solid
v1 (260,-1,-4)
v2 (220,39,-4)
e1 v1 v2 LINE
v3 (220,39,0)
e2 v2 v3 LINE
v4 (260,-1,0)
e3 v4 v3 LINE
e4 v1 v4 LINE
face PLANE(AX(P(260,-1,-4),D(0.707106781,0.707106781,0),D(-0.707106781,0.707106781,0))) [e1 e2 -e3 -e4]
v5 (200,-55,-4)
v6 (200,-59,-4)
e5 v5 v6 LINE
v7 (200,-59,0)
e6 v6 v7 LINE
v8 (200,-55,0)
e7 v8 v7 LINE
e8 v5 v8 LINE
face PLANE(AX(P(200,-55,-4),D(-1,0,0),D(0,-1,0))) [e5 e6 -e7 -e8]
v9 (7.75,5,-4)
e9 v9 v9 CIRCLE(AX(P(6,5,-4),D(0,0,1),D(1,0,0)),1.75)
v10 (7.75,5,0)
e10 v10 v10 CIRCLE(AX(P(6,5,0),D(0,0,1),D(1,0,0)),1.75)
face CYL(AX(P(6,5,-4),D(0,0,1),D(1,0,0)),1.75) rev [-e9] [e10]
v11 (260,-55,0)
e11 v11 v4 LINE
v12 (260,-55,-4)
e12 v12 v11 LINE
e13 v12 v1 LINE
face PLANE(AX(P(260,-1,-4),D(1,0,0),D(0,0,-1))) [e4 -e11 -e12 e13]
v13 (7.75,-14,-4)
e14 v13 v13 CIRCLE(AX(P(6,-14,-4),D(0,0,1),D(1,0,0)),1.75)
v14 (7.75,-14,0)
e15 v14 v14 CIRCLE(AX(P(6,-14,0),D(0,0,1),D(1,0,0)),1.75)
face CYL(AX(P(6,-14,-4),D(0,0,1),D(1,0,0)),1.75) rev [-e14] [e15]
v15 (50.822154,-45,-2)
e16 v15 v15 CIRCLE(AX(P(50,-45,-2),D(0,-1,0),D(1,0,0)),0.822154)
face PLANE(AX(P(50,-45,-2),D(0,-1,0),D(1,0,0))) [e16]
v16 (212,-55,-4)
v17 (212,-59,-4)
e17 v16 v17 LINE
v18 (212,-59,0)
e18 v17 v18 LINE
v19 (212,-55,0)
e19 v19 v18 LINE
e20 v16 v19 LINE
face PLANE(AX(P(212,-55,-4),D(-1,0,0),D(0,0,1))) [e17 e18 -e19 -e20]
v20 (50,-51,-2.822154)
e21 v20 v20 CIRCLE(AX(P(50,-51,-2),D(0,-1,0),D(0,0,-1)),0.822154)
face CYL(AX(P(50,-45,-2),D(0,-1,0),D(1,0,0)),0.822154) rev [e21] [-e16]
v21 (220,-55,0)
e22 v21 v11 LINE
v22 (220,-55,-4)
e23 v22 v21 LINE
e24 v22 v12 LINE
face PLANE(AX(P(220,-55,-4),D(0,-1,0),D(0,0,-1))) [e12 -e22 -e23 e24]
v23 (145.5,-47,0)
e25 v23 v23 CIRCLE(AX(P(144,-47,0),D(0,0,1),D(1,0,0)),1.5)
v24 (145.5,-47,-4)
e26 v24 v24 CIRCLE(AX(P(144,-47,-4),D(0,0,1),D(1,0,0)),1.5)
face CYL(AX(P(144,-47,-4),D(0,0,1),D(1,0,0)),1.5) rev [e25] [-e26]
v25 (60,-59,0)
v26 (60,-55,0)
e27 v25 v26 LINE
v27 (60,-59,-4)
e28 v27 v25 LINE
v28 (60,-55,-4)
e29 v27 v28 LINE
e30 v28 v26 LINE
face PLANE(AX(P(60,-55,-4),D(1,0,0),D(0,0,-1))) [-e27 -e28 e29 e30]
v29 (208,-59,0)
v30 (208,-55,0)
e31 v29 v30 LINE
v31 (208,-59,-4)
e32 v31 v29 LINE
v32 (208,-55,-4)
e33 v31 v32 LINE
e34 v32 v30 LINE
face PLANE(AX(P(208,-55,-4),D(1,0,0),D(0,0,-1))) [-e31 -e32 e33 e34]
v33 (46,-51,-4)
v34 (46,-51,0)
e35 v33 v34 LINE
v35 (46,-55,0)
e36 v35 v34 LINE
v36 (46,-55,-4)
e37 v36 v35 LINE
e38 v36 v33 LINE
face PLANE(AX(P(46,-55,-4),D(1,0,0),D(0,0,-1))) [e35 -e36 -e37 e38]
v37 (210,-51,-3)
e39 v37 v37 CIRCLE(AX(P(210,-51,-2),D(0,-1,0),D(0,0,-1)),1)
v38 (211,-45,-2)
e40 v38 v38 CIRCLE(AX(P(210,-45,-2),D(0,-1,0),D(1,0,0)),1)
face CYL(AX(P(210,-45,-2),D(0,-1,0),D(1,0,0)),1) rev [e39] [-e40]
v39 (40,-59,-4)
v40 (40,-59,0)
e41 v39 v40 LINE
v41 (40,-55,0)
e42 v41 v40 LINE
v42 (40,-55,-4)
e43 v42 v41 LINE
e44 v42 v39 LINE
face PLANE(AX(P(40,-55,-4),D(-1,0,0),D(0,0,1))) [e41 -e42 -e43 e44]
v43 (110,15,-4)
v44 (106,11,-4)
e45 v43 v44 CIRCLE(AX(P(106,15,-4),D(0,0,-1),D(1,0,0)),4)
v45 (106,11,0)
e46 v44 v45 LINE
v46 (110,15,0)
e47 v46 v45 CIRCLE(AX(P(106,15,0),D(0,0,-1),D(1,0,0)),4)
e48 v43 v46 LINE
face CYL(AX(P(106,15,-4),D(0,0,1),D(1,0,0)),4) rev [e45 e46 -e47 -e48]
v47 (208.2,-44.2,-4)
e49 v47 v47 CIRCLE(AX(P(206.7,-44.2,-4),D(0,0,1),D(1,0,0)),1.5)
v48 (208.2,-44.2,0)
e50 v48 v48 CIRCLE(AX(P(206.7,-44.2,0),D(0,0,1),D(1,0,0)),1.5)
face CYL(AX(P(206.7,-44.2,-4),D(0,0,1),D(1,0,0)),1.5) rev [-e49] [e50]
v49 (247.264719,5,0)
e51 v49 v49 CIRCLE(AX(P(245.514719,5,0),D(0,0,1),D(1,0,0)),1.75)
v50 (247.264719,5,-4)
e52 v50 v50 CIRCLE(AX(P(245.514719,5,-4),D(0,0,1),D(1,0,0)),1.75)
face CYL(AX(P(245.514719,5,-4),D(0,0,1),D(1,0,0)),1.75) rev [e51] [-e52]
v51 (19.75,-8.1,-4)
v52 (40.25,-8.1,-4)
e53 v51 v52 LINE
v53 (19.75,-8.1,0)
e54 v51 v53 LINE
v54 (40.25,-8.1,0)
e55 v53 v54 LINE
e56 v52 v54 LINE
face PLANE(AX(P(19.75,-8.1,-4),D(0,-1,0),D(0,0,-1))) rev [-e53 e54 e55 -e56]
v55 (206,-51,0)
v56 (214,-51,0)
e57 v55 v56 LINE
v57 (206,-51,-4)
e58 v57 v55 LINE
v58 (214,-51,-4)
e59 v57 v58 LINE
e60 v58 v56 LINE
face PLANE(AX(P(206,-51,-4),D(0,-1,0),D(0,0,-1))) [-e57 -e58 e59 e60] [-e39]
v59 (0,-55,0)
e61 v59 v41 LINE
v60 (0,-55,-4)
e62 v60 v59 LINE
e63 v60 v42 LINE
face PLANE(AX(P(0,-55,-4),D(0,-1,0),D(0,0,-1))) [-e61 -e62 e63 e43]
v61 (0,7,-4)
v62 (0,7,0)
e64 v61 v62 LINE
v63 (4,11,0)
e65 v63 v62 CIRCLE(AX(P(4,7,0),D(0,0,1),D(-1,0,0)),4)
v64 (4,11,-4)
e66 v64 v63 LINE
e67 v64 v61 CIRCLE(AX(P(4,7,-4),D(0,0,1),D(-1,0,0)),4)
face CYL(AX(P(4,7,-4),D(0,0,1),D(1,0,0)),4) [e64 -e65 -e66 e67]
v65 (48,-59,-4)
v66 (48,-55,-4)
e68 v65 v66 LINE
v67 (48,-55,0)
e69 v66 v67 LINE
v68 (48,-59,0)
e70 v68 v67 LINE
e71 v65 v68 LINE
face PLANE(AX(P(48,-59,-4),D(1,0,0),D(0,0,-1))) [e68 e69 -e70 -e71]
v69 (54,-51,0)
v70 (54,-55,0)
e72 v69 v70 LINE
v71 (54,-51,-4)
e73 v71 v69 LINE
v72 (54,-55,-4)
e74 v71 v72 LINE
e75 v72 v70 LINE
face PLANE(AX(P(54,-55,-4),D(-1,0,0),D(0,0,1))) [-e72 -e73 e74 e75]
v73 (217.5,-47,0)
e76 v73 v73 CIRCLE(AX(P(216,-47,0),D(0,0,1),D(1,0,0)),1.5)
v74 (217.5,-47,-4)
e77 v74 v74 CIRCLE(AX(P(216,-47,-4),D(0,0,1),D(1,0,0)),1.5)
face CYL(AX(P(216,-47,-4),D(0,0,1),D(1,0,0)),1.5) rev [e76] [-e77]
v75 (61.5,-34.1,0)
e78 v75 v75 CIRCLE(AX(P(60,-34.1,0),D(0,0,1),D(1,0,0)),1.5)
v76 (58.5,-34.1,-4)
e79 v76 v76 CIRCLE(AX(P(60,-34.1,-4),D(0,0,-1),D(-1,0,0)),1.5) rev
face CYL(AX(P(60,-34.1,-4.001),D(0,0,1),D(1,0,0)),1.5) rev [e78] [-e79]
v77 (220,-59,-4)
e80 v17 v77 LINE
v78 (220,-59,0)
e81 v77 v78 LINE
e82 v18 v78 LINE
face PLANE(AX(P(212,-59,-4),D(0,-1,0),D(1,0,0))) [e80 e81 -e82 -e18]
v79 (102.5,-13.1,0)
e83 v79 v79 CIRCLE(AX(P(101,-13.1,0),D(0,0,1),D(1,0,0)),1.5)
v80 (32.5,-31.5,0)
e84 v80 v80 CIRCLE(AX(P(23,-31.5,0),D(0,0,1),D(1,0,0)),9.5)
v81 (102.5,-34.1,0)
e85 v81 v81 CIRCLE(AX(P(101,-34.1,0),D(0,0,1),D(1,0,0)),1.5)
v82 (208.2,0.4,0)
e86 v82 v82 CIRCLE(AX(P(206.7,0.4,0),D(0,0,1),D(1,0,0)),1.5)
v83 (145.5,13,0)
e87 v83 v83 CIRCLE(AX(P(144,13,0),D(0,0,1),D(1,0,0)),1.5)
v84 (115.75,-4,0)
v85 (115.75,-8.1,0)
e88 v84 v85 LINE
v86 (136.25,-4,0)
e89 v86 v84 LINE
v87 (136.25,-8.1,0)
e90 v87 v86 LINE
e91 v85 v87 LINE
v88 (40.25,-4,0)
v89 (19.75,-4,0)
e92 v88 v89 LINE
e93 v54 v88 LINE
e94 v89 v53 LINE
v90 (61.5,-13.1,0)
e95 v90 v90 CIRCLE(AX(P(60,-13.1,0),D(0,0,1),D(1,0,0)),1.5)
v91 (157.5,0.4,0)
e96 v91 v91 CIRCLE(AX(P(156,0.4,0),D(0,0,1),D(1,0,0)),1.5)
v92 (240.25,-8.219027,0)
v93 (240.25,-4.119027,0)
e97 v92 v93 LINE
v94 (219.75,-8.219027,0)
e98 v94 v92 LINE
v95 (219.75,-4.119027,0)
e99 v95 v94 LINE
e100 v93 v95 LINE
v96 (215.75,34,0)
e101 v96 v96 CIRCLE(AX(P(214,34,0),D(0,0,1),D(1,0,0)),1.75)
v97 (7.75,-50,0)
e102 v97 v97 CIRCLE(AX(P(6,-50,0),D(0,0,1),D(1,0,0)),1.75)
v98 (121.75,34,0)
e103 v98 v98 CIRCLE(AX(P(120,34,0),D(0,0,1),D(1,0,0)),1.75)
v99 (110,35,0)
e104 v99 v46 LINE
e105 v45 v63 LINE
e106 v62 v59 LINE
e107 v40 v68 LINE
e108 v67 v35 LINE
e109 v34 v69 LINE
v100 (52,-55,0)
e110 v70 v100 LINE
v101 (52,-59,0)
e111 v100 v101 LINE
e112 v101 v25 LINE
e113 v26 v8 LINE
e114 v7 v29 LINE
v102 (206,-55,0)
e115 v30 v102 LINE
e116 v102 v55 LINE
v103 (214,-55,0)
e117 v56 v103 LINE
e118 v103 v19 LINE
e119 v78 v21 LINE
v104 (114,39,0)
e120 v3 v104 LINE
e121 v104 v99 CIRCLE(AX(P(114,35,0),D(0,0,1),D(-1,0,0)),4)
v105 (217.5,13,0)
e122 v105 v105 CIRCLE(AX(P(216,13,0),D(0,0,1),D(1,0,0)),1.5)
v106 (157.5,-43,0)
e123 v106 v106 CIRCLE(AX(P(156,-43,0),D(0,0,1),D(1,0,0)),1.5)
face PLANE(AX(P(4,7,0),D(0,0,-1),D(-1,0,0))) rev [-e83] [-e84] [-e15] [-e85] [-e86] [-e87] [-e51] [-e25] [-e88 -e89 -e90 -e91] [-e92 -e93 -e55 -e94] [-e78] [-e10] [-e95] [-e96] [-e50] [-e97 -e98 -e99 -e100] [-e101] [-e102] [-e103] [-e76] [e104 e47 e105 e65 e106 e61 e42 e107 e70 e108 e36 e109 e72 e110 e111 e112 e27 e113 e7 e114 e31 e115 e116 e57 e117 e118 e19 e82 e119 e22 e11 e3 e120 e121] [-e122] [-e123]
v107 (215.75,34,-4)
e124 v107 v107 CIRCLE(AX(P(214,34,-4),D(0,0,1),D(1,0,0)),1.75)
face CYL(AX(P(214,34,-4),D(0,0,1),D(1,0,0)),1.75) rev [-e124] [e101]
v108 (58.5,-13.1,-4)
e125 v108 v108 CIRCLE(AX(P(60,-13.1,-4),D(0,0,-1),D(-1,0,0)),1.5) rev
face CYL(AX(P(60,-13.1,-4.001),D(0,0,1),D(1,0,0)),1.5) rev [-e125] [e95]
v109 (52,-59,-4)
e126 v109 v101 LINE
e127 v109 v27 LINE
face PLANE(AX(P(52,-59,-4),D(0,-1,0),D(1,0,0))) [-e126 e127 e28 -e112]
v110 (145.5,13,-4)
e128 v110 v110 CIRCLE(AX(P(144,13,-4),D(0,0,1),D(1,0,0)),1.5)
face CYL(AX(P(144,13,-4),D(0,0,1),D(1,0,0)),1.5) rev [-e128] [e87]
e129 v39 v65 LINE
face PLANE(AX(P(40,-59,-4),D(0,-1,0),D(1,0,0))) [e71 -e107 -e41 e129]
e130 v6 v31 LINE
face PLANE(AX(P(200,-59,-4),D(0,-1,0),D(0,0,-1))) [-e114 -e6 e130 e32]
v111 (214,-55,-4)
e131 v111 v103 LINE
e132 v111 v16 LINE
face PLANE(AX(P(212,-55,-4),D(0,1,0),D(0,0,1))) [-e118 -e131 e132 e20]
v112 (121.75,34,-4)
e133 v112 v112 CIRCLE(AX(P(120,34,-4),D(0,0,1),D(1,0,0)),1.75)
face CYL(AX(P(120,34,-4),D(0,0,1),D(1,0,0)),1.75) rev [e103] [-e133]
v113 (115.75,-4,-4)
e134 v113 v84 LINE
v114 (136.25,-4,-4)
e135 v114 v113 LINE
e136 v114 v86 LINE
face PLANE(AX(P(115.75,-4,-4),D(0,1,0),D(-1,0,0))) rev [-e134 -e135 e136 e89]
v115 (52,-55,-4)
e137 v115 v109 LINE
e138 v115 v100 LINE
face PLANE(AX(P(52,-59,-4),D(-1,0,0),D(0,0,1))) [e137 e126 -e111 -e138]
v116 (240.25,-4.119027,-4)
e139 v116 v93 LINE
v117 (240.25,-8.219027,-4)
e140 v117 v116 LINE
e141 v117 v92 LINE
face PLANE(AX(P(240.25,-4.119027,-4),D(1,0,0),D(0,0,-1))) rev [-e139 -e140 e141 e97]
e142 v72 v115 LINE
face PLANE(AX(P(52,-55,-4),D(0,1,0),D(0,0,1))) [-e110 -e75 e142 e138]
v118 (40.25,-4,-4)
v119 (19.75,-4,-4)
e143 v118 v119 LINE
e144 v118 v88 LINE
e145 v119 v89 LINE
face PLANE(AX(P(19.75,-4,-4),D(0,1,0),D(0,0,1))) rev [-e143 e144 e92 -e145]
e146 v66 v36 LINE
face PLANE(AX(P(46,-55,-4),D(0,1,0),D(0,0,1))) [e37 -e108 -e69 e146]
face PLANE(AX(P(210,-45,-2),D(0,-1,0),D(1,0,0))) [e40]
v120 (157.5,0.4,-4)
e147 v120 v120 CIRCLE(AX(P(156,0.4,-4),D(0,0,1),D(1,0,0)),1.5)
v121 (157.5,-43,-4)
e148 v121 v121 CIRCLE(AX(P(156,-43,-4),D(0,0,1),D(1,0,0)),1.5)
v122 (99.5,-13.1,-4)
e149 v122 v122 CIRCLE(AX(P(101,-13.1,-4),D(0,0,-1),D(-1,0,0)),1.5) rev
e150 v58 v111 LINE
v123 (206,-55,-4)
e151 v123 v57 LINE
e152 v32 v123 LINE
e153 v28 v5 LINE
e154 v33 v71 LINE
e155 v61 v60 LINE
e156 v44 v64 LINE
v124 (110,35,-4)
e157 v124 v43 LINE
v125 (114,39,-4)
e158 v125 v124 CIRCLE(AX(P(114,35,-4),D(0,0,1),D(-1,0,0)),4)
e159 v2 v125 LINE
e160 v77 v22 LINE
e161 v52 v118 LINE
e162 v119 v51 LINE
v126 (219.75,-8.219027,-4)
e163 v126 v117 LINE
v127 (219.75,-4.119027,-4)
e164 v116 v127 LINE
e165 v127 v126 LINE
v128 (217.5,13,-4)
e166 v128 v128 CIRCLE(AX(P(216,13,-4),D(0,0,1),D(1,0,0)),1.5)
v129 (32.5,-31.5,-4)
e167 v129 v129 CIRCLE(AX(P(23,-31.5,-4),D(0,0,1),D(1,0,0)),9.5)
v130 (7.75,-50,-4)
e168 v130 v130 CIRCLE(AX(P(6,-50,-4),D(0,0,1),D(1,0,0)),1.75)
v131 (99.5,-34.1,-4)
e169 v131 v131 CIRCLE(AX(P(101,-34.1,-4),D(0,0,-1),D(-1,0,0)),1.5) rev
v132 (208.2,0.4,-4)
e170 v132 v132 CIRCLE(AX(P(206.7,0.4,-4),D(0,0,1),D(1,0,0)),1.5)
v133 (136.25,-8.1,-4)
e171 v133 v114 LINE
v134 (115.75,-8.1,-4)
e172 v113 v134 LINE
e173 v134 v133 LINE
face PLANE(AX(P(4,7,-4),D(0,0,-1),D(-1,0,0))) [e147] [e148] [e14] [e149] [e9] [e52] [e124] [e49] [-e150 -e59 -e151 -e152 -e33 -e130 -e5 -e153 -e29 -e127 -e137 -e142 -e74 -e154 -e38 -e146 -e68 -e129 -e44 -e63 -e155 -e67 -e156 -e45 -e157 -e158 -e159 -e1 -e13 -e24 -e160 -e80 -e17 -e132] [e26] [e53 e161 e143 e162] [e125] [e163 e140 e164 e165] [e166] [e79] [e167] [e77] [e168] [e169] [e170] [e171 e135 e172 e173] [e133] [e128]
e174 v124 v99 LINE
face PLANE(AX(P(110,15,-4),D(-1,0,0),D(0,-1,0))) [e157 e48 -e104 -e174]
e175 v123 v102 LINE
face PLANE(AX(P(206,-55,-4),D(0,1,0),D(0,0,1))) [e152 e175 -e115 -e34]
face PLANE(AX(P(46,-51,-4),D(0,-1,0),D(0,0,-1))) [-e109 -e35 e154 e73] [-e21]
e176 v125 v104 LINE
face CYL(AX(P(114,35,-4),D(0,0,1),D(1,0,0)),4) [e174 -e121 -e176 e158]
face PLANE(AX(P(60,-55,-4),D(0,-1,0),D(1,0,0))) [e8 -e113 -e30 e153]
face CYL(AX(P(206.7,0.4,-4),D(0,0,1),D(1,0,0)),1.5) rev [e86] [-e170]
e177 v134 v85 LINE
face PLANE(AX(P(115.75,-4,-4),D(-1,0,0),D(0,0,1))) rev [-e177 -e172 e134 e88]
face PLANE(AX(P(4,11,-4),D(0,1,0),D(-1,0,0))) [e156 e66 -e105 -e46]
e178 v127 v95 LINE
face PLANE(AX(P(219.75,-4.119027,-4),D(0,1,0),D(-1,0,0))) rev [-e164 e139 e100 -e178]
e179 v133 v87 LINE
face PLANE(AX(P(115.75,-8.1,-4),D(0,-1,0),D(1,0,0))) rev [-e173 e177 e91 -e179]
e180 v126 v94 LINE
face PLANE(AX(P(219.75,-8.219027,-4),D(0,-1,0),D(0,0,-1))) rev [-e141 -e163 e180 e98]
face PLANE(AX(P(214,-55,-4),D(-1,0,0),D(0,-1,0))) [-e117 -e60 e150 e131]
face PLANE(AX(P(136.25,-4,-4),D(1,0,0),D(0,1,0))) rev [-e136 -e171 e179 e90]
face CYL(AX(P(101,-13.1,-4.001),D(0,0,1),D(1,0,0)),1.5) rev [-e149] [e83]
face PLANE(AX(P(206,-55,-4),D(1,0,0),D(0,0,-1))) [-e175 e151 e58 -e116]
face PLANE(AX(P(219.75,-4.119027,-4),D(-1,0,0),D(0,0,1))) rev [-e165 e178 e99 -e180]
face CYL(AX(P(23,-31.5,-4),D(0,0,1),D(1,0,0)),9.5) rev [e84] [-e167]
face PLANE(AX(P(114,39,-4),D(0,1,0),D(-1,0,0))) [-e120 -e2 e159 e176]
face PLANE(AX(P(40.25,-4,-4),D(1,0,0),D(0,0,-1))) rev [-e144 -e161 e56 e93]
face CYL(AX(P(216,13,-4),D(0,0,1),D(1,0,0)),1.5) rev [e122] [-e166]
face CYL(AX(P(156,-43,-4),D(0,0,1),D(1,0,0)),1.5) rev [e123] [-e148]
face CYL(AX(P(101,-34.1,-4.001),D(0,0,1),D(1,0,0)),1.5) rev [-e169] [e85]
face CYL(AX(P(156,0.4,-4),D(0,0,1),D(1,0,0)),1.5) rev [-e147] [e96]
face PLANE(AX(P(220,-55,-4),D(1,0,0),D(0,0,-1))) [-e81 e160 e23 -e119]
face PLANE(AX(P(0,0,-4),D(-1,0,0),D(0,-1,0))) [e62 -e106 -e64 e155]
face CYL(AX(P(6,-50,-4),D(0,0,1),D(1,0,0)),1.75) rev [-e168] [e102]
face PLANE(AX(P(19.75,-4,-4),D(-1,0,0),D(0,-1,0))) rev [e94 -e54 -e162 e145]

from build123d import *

# Parameters (mm, degrees)
SKETCH_1_R             = 9.5
SKETCH_1_R_2           = 1.5
SKETCH_1_W             = 20.5
SKETCH_1_H             = 4.1
SM_BASE_FLANGE_1_DEPTH = 4
SKETCH_6_R             = 1.75
CUT_EXTRUDE_1_DEPTH    = 267.640207021
SKETCH_8_R             = 1
SKETCH_8_R_2           = 0.822154456
CUT_EXTRUDE_3_DEPTH    = 10
CUT_EXTRUDE_4_REACH    = 268.64
SKETCH_9_R             = 1.5


# Sheet-metal steps are written as plain solids
with BuildPart() as part:
    # Sketch 1 → Базовая кромка1 (new body)
    with BuildSketch(Plane.XY):
        with BuildLine():
            Line((52, -59), (60, -59))
            Line((60, -59), (60, -55))
            Line((60, -55), (200, -55))
            Line((200, -55), (200, -59))
            Line((200, -59), (208, -59))
            Line((208, -59), (208, -55))
            Line((208, -55), (206, -55))
            Line((206, -55), (206, -51))
            Line((206, -51), (214, -51))
            Line((214, -51), (214, -55))
            Line((214, -55), (212, -55))
            Line((212, -55), (212, -59))
            Line((212, -59), (220, -59))
            Line((220, -59), (220, -55))
            Line((220, -55), (260, -55))
            Line((260, -55), (260, -1))
            Line((260, -1), (220, 39))
            Line((220, 39), (120, 39))
            Line((120, 39), (114, 39))
            ThreePointArc((114, 39), (111.171572875, 37.828427125), (110, 35))
            Line((110, 35), (110, 15))
            ThreePointArc((110, 15), (108.828427125, 12.171572875), (106, 11))
            Line((106, 11), (4, 11))
            ThreePointArc((4, 11), (1.171572875, 9.828427125), (0, 7))
            Line((0, 7), (0, 0))
            Line((0, 0), (0, -55))
            Line((0, -55), (40, -55))
            Line((40, -55), (40, -59))
            Line((40, -59), (48, -59))
            Line((48, -59), (48, -55))
            Line((48, -55), (46, -55))
            Line((46, -55), (46, -51))
            Line((46, -51), (54, -51))
            Line((54, -51), (54, -55))
            Line((54, -55), (52, -55))
            Line((52, -55), (52, -59))
        make_face()
        with Locations((23, -31.5)):
            Circle(SKETCH_1_R, mode=Mode.SUBTRACT)
        with Locations((156, -43)):
            Circle(SKETCH_1_R_2, mode=Mode.SUBTRACT)
        with Locations((206.7, 0.4)):
            Circle(SKETCH_1_R_2, mode=Mode.SUBTRACT)
        with Locations((156, 0.4)):
            Circle(SKETCH_1_R_2, mode=Mode.SUBTRACT)
        with Locations((206.7, -44.2)):
            Circle(SKETCH_1_R_2, mode=Mode.SUBTRACT)
        with Locations((144, -47)):
            Circle(SKETCH_1_R_2, mode=Mode.SUBTRACT)
        with Locations((216, -47)):
            Circle(SKETCH_1_R_2, mode=Mode.SUBTRACT)
        with Locations((216, 13)):
            Circle(SKETCH_1_R_2, mode=Mode.SUBTRACT)
        with Locations((144, 13)):
            Circle(SKETCH_1_R_2, mode=Mode.SUBTRACT)
        with Locations((30, -6.05)):
            Rectangle(SKETCH_1_W, SKETCH_1_H, mode=Mode.SUBTRACT)
        with Locations((230, -6.169027082)):
            Rectangle(SKETCH_1_W, SKETCH_1_H, mode=Mode.SUBTRACT)
        with Locations((126, -6.05)):
            Rectangle(SKETCH_1_W, SKETCH_1_H, mode=Mode.SUBTRACT)
    extrude(amount=-SM_BASE_FLANGE_1_DEPTH)

    # Эскиз6 → Вырез-Вытянуть1 (cut, through all)
    with BuildSketch(Plane.XY):
        with Locations((6, 5)):
            Circle(SKETCH_6_R)
        with Locations((120, 34)):
            Circle(SKETCH_6_R)
        with Locations((214, 34)):
            Circle(SKETCH_6_R)
        with Locations((245.514718626, 5)):
            Circle(SKETCH_6_R)
        with Locations((6, -14)):
            Circle(SKETCH_6_R)
        with Locations((6, -50)):
            Circle(SKETCH_6_R)
    extrude(amount=-CUT_EXTRUDE_1_DEPTH, mode=Mode.SUBTRACT)

    # Эскиз8 → Вырез-Вытянуть3 (cut)
    with BuildSketch(Plane.XZ.offset(55)):
        with Locations((210, -2)):
            Circle(SKETCH_8_R)
        with Locations((50, -2)):
            Circle(SKETCH_8_R_2)
    extrude(amount=-CUT_EXTRUDE_3_DEPTH, mode=Mode.SUBTRACT)

    # Эскиз9 → Вырез-Вытянуть4 (cut, up to next)
    with BuildSketch(Plane.XY, mode=Mode.PRIVATE) as cut_extrude_4_sk1:
        with Locations((60, -13.1)):
            Circle(SKETCH_9_R)
    cut_extrude_4_tool1 = extrude(cut_extrude_4_sk1.sketch, amount=-CUT_EXTRUDE_4_REACH, mode=Mode.PRIVATE) & part.part
    # Эскиз9 → Вырез-Вытянуть4 (cut, up to next)
    with BuildSketch(Plane.XY, mode=Mode.PRIVATE) as cut_extrude_4_sk2:
        with Locations((101, -34.1)):
            Circle(SKETCH_9_R)
    cut_extrude_4_tool2 = extrude(cut_extrude_4_sk2.sketch, amount=-CUT_EXTRUDE_4_REACH, mode=Mode.PRIVATE) & part.part
    # Эскиз9 → Вырез-Вытянуть4 (cut, up to next)
    with BuildSketch(Plane.XY, mode=Mode.PRIVATE) as cut_extrude_4_sk3:
        with Locations((101, -13.1)):
            Circle(SKETCH_9_R)
    cut_extrude_4_tool3 = extrude(cut_extrude_4_sk3.sketch, amount=-CUT_EXTRUDE_4_REACH, mode=Mode.PRIVATE) & part.part
    # Эскиз9 → Вырез-Вытянуть4 (cut, up to next)
    with BuildSketch(Plane.XY, mode=Mode.PRIVATE) as cut_extrude_4_sk4:
        with Locations((60, -34.1)):
            Circle(SKETCH_9_R)
    cut_extrude_4_tool4 = extrude(cut_extrude_4_sk4.sketch, amount=-CUT_EXTRUDE_4_REACH, mode=Mode.PRIVATE) & part.part
    add(cut_extrude_4_tool1.solids().sort_by_distance((60, -13.1, 0))[0], mode=Mode.SUBTRACT)
    add(cut_extrude_4_tool2.solids().sort_by_distance((101, -34.1, 0))[0], mode=Mode.SUBTRACT)
    add(cut_extrude_4_tool3.solids().sort_by_distance((101, -13.1, 0))[0], mode=Mode.SUBTRACT)
    add(cut_extrude_4_tool4.solids().sort_by_distance((60, -34.1, 0))[0], mode=Mode.SUBTRACT)


solid = part.part
